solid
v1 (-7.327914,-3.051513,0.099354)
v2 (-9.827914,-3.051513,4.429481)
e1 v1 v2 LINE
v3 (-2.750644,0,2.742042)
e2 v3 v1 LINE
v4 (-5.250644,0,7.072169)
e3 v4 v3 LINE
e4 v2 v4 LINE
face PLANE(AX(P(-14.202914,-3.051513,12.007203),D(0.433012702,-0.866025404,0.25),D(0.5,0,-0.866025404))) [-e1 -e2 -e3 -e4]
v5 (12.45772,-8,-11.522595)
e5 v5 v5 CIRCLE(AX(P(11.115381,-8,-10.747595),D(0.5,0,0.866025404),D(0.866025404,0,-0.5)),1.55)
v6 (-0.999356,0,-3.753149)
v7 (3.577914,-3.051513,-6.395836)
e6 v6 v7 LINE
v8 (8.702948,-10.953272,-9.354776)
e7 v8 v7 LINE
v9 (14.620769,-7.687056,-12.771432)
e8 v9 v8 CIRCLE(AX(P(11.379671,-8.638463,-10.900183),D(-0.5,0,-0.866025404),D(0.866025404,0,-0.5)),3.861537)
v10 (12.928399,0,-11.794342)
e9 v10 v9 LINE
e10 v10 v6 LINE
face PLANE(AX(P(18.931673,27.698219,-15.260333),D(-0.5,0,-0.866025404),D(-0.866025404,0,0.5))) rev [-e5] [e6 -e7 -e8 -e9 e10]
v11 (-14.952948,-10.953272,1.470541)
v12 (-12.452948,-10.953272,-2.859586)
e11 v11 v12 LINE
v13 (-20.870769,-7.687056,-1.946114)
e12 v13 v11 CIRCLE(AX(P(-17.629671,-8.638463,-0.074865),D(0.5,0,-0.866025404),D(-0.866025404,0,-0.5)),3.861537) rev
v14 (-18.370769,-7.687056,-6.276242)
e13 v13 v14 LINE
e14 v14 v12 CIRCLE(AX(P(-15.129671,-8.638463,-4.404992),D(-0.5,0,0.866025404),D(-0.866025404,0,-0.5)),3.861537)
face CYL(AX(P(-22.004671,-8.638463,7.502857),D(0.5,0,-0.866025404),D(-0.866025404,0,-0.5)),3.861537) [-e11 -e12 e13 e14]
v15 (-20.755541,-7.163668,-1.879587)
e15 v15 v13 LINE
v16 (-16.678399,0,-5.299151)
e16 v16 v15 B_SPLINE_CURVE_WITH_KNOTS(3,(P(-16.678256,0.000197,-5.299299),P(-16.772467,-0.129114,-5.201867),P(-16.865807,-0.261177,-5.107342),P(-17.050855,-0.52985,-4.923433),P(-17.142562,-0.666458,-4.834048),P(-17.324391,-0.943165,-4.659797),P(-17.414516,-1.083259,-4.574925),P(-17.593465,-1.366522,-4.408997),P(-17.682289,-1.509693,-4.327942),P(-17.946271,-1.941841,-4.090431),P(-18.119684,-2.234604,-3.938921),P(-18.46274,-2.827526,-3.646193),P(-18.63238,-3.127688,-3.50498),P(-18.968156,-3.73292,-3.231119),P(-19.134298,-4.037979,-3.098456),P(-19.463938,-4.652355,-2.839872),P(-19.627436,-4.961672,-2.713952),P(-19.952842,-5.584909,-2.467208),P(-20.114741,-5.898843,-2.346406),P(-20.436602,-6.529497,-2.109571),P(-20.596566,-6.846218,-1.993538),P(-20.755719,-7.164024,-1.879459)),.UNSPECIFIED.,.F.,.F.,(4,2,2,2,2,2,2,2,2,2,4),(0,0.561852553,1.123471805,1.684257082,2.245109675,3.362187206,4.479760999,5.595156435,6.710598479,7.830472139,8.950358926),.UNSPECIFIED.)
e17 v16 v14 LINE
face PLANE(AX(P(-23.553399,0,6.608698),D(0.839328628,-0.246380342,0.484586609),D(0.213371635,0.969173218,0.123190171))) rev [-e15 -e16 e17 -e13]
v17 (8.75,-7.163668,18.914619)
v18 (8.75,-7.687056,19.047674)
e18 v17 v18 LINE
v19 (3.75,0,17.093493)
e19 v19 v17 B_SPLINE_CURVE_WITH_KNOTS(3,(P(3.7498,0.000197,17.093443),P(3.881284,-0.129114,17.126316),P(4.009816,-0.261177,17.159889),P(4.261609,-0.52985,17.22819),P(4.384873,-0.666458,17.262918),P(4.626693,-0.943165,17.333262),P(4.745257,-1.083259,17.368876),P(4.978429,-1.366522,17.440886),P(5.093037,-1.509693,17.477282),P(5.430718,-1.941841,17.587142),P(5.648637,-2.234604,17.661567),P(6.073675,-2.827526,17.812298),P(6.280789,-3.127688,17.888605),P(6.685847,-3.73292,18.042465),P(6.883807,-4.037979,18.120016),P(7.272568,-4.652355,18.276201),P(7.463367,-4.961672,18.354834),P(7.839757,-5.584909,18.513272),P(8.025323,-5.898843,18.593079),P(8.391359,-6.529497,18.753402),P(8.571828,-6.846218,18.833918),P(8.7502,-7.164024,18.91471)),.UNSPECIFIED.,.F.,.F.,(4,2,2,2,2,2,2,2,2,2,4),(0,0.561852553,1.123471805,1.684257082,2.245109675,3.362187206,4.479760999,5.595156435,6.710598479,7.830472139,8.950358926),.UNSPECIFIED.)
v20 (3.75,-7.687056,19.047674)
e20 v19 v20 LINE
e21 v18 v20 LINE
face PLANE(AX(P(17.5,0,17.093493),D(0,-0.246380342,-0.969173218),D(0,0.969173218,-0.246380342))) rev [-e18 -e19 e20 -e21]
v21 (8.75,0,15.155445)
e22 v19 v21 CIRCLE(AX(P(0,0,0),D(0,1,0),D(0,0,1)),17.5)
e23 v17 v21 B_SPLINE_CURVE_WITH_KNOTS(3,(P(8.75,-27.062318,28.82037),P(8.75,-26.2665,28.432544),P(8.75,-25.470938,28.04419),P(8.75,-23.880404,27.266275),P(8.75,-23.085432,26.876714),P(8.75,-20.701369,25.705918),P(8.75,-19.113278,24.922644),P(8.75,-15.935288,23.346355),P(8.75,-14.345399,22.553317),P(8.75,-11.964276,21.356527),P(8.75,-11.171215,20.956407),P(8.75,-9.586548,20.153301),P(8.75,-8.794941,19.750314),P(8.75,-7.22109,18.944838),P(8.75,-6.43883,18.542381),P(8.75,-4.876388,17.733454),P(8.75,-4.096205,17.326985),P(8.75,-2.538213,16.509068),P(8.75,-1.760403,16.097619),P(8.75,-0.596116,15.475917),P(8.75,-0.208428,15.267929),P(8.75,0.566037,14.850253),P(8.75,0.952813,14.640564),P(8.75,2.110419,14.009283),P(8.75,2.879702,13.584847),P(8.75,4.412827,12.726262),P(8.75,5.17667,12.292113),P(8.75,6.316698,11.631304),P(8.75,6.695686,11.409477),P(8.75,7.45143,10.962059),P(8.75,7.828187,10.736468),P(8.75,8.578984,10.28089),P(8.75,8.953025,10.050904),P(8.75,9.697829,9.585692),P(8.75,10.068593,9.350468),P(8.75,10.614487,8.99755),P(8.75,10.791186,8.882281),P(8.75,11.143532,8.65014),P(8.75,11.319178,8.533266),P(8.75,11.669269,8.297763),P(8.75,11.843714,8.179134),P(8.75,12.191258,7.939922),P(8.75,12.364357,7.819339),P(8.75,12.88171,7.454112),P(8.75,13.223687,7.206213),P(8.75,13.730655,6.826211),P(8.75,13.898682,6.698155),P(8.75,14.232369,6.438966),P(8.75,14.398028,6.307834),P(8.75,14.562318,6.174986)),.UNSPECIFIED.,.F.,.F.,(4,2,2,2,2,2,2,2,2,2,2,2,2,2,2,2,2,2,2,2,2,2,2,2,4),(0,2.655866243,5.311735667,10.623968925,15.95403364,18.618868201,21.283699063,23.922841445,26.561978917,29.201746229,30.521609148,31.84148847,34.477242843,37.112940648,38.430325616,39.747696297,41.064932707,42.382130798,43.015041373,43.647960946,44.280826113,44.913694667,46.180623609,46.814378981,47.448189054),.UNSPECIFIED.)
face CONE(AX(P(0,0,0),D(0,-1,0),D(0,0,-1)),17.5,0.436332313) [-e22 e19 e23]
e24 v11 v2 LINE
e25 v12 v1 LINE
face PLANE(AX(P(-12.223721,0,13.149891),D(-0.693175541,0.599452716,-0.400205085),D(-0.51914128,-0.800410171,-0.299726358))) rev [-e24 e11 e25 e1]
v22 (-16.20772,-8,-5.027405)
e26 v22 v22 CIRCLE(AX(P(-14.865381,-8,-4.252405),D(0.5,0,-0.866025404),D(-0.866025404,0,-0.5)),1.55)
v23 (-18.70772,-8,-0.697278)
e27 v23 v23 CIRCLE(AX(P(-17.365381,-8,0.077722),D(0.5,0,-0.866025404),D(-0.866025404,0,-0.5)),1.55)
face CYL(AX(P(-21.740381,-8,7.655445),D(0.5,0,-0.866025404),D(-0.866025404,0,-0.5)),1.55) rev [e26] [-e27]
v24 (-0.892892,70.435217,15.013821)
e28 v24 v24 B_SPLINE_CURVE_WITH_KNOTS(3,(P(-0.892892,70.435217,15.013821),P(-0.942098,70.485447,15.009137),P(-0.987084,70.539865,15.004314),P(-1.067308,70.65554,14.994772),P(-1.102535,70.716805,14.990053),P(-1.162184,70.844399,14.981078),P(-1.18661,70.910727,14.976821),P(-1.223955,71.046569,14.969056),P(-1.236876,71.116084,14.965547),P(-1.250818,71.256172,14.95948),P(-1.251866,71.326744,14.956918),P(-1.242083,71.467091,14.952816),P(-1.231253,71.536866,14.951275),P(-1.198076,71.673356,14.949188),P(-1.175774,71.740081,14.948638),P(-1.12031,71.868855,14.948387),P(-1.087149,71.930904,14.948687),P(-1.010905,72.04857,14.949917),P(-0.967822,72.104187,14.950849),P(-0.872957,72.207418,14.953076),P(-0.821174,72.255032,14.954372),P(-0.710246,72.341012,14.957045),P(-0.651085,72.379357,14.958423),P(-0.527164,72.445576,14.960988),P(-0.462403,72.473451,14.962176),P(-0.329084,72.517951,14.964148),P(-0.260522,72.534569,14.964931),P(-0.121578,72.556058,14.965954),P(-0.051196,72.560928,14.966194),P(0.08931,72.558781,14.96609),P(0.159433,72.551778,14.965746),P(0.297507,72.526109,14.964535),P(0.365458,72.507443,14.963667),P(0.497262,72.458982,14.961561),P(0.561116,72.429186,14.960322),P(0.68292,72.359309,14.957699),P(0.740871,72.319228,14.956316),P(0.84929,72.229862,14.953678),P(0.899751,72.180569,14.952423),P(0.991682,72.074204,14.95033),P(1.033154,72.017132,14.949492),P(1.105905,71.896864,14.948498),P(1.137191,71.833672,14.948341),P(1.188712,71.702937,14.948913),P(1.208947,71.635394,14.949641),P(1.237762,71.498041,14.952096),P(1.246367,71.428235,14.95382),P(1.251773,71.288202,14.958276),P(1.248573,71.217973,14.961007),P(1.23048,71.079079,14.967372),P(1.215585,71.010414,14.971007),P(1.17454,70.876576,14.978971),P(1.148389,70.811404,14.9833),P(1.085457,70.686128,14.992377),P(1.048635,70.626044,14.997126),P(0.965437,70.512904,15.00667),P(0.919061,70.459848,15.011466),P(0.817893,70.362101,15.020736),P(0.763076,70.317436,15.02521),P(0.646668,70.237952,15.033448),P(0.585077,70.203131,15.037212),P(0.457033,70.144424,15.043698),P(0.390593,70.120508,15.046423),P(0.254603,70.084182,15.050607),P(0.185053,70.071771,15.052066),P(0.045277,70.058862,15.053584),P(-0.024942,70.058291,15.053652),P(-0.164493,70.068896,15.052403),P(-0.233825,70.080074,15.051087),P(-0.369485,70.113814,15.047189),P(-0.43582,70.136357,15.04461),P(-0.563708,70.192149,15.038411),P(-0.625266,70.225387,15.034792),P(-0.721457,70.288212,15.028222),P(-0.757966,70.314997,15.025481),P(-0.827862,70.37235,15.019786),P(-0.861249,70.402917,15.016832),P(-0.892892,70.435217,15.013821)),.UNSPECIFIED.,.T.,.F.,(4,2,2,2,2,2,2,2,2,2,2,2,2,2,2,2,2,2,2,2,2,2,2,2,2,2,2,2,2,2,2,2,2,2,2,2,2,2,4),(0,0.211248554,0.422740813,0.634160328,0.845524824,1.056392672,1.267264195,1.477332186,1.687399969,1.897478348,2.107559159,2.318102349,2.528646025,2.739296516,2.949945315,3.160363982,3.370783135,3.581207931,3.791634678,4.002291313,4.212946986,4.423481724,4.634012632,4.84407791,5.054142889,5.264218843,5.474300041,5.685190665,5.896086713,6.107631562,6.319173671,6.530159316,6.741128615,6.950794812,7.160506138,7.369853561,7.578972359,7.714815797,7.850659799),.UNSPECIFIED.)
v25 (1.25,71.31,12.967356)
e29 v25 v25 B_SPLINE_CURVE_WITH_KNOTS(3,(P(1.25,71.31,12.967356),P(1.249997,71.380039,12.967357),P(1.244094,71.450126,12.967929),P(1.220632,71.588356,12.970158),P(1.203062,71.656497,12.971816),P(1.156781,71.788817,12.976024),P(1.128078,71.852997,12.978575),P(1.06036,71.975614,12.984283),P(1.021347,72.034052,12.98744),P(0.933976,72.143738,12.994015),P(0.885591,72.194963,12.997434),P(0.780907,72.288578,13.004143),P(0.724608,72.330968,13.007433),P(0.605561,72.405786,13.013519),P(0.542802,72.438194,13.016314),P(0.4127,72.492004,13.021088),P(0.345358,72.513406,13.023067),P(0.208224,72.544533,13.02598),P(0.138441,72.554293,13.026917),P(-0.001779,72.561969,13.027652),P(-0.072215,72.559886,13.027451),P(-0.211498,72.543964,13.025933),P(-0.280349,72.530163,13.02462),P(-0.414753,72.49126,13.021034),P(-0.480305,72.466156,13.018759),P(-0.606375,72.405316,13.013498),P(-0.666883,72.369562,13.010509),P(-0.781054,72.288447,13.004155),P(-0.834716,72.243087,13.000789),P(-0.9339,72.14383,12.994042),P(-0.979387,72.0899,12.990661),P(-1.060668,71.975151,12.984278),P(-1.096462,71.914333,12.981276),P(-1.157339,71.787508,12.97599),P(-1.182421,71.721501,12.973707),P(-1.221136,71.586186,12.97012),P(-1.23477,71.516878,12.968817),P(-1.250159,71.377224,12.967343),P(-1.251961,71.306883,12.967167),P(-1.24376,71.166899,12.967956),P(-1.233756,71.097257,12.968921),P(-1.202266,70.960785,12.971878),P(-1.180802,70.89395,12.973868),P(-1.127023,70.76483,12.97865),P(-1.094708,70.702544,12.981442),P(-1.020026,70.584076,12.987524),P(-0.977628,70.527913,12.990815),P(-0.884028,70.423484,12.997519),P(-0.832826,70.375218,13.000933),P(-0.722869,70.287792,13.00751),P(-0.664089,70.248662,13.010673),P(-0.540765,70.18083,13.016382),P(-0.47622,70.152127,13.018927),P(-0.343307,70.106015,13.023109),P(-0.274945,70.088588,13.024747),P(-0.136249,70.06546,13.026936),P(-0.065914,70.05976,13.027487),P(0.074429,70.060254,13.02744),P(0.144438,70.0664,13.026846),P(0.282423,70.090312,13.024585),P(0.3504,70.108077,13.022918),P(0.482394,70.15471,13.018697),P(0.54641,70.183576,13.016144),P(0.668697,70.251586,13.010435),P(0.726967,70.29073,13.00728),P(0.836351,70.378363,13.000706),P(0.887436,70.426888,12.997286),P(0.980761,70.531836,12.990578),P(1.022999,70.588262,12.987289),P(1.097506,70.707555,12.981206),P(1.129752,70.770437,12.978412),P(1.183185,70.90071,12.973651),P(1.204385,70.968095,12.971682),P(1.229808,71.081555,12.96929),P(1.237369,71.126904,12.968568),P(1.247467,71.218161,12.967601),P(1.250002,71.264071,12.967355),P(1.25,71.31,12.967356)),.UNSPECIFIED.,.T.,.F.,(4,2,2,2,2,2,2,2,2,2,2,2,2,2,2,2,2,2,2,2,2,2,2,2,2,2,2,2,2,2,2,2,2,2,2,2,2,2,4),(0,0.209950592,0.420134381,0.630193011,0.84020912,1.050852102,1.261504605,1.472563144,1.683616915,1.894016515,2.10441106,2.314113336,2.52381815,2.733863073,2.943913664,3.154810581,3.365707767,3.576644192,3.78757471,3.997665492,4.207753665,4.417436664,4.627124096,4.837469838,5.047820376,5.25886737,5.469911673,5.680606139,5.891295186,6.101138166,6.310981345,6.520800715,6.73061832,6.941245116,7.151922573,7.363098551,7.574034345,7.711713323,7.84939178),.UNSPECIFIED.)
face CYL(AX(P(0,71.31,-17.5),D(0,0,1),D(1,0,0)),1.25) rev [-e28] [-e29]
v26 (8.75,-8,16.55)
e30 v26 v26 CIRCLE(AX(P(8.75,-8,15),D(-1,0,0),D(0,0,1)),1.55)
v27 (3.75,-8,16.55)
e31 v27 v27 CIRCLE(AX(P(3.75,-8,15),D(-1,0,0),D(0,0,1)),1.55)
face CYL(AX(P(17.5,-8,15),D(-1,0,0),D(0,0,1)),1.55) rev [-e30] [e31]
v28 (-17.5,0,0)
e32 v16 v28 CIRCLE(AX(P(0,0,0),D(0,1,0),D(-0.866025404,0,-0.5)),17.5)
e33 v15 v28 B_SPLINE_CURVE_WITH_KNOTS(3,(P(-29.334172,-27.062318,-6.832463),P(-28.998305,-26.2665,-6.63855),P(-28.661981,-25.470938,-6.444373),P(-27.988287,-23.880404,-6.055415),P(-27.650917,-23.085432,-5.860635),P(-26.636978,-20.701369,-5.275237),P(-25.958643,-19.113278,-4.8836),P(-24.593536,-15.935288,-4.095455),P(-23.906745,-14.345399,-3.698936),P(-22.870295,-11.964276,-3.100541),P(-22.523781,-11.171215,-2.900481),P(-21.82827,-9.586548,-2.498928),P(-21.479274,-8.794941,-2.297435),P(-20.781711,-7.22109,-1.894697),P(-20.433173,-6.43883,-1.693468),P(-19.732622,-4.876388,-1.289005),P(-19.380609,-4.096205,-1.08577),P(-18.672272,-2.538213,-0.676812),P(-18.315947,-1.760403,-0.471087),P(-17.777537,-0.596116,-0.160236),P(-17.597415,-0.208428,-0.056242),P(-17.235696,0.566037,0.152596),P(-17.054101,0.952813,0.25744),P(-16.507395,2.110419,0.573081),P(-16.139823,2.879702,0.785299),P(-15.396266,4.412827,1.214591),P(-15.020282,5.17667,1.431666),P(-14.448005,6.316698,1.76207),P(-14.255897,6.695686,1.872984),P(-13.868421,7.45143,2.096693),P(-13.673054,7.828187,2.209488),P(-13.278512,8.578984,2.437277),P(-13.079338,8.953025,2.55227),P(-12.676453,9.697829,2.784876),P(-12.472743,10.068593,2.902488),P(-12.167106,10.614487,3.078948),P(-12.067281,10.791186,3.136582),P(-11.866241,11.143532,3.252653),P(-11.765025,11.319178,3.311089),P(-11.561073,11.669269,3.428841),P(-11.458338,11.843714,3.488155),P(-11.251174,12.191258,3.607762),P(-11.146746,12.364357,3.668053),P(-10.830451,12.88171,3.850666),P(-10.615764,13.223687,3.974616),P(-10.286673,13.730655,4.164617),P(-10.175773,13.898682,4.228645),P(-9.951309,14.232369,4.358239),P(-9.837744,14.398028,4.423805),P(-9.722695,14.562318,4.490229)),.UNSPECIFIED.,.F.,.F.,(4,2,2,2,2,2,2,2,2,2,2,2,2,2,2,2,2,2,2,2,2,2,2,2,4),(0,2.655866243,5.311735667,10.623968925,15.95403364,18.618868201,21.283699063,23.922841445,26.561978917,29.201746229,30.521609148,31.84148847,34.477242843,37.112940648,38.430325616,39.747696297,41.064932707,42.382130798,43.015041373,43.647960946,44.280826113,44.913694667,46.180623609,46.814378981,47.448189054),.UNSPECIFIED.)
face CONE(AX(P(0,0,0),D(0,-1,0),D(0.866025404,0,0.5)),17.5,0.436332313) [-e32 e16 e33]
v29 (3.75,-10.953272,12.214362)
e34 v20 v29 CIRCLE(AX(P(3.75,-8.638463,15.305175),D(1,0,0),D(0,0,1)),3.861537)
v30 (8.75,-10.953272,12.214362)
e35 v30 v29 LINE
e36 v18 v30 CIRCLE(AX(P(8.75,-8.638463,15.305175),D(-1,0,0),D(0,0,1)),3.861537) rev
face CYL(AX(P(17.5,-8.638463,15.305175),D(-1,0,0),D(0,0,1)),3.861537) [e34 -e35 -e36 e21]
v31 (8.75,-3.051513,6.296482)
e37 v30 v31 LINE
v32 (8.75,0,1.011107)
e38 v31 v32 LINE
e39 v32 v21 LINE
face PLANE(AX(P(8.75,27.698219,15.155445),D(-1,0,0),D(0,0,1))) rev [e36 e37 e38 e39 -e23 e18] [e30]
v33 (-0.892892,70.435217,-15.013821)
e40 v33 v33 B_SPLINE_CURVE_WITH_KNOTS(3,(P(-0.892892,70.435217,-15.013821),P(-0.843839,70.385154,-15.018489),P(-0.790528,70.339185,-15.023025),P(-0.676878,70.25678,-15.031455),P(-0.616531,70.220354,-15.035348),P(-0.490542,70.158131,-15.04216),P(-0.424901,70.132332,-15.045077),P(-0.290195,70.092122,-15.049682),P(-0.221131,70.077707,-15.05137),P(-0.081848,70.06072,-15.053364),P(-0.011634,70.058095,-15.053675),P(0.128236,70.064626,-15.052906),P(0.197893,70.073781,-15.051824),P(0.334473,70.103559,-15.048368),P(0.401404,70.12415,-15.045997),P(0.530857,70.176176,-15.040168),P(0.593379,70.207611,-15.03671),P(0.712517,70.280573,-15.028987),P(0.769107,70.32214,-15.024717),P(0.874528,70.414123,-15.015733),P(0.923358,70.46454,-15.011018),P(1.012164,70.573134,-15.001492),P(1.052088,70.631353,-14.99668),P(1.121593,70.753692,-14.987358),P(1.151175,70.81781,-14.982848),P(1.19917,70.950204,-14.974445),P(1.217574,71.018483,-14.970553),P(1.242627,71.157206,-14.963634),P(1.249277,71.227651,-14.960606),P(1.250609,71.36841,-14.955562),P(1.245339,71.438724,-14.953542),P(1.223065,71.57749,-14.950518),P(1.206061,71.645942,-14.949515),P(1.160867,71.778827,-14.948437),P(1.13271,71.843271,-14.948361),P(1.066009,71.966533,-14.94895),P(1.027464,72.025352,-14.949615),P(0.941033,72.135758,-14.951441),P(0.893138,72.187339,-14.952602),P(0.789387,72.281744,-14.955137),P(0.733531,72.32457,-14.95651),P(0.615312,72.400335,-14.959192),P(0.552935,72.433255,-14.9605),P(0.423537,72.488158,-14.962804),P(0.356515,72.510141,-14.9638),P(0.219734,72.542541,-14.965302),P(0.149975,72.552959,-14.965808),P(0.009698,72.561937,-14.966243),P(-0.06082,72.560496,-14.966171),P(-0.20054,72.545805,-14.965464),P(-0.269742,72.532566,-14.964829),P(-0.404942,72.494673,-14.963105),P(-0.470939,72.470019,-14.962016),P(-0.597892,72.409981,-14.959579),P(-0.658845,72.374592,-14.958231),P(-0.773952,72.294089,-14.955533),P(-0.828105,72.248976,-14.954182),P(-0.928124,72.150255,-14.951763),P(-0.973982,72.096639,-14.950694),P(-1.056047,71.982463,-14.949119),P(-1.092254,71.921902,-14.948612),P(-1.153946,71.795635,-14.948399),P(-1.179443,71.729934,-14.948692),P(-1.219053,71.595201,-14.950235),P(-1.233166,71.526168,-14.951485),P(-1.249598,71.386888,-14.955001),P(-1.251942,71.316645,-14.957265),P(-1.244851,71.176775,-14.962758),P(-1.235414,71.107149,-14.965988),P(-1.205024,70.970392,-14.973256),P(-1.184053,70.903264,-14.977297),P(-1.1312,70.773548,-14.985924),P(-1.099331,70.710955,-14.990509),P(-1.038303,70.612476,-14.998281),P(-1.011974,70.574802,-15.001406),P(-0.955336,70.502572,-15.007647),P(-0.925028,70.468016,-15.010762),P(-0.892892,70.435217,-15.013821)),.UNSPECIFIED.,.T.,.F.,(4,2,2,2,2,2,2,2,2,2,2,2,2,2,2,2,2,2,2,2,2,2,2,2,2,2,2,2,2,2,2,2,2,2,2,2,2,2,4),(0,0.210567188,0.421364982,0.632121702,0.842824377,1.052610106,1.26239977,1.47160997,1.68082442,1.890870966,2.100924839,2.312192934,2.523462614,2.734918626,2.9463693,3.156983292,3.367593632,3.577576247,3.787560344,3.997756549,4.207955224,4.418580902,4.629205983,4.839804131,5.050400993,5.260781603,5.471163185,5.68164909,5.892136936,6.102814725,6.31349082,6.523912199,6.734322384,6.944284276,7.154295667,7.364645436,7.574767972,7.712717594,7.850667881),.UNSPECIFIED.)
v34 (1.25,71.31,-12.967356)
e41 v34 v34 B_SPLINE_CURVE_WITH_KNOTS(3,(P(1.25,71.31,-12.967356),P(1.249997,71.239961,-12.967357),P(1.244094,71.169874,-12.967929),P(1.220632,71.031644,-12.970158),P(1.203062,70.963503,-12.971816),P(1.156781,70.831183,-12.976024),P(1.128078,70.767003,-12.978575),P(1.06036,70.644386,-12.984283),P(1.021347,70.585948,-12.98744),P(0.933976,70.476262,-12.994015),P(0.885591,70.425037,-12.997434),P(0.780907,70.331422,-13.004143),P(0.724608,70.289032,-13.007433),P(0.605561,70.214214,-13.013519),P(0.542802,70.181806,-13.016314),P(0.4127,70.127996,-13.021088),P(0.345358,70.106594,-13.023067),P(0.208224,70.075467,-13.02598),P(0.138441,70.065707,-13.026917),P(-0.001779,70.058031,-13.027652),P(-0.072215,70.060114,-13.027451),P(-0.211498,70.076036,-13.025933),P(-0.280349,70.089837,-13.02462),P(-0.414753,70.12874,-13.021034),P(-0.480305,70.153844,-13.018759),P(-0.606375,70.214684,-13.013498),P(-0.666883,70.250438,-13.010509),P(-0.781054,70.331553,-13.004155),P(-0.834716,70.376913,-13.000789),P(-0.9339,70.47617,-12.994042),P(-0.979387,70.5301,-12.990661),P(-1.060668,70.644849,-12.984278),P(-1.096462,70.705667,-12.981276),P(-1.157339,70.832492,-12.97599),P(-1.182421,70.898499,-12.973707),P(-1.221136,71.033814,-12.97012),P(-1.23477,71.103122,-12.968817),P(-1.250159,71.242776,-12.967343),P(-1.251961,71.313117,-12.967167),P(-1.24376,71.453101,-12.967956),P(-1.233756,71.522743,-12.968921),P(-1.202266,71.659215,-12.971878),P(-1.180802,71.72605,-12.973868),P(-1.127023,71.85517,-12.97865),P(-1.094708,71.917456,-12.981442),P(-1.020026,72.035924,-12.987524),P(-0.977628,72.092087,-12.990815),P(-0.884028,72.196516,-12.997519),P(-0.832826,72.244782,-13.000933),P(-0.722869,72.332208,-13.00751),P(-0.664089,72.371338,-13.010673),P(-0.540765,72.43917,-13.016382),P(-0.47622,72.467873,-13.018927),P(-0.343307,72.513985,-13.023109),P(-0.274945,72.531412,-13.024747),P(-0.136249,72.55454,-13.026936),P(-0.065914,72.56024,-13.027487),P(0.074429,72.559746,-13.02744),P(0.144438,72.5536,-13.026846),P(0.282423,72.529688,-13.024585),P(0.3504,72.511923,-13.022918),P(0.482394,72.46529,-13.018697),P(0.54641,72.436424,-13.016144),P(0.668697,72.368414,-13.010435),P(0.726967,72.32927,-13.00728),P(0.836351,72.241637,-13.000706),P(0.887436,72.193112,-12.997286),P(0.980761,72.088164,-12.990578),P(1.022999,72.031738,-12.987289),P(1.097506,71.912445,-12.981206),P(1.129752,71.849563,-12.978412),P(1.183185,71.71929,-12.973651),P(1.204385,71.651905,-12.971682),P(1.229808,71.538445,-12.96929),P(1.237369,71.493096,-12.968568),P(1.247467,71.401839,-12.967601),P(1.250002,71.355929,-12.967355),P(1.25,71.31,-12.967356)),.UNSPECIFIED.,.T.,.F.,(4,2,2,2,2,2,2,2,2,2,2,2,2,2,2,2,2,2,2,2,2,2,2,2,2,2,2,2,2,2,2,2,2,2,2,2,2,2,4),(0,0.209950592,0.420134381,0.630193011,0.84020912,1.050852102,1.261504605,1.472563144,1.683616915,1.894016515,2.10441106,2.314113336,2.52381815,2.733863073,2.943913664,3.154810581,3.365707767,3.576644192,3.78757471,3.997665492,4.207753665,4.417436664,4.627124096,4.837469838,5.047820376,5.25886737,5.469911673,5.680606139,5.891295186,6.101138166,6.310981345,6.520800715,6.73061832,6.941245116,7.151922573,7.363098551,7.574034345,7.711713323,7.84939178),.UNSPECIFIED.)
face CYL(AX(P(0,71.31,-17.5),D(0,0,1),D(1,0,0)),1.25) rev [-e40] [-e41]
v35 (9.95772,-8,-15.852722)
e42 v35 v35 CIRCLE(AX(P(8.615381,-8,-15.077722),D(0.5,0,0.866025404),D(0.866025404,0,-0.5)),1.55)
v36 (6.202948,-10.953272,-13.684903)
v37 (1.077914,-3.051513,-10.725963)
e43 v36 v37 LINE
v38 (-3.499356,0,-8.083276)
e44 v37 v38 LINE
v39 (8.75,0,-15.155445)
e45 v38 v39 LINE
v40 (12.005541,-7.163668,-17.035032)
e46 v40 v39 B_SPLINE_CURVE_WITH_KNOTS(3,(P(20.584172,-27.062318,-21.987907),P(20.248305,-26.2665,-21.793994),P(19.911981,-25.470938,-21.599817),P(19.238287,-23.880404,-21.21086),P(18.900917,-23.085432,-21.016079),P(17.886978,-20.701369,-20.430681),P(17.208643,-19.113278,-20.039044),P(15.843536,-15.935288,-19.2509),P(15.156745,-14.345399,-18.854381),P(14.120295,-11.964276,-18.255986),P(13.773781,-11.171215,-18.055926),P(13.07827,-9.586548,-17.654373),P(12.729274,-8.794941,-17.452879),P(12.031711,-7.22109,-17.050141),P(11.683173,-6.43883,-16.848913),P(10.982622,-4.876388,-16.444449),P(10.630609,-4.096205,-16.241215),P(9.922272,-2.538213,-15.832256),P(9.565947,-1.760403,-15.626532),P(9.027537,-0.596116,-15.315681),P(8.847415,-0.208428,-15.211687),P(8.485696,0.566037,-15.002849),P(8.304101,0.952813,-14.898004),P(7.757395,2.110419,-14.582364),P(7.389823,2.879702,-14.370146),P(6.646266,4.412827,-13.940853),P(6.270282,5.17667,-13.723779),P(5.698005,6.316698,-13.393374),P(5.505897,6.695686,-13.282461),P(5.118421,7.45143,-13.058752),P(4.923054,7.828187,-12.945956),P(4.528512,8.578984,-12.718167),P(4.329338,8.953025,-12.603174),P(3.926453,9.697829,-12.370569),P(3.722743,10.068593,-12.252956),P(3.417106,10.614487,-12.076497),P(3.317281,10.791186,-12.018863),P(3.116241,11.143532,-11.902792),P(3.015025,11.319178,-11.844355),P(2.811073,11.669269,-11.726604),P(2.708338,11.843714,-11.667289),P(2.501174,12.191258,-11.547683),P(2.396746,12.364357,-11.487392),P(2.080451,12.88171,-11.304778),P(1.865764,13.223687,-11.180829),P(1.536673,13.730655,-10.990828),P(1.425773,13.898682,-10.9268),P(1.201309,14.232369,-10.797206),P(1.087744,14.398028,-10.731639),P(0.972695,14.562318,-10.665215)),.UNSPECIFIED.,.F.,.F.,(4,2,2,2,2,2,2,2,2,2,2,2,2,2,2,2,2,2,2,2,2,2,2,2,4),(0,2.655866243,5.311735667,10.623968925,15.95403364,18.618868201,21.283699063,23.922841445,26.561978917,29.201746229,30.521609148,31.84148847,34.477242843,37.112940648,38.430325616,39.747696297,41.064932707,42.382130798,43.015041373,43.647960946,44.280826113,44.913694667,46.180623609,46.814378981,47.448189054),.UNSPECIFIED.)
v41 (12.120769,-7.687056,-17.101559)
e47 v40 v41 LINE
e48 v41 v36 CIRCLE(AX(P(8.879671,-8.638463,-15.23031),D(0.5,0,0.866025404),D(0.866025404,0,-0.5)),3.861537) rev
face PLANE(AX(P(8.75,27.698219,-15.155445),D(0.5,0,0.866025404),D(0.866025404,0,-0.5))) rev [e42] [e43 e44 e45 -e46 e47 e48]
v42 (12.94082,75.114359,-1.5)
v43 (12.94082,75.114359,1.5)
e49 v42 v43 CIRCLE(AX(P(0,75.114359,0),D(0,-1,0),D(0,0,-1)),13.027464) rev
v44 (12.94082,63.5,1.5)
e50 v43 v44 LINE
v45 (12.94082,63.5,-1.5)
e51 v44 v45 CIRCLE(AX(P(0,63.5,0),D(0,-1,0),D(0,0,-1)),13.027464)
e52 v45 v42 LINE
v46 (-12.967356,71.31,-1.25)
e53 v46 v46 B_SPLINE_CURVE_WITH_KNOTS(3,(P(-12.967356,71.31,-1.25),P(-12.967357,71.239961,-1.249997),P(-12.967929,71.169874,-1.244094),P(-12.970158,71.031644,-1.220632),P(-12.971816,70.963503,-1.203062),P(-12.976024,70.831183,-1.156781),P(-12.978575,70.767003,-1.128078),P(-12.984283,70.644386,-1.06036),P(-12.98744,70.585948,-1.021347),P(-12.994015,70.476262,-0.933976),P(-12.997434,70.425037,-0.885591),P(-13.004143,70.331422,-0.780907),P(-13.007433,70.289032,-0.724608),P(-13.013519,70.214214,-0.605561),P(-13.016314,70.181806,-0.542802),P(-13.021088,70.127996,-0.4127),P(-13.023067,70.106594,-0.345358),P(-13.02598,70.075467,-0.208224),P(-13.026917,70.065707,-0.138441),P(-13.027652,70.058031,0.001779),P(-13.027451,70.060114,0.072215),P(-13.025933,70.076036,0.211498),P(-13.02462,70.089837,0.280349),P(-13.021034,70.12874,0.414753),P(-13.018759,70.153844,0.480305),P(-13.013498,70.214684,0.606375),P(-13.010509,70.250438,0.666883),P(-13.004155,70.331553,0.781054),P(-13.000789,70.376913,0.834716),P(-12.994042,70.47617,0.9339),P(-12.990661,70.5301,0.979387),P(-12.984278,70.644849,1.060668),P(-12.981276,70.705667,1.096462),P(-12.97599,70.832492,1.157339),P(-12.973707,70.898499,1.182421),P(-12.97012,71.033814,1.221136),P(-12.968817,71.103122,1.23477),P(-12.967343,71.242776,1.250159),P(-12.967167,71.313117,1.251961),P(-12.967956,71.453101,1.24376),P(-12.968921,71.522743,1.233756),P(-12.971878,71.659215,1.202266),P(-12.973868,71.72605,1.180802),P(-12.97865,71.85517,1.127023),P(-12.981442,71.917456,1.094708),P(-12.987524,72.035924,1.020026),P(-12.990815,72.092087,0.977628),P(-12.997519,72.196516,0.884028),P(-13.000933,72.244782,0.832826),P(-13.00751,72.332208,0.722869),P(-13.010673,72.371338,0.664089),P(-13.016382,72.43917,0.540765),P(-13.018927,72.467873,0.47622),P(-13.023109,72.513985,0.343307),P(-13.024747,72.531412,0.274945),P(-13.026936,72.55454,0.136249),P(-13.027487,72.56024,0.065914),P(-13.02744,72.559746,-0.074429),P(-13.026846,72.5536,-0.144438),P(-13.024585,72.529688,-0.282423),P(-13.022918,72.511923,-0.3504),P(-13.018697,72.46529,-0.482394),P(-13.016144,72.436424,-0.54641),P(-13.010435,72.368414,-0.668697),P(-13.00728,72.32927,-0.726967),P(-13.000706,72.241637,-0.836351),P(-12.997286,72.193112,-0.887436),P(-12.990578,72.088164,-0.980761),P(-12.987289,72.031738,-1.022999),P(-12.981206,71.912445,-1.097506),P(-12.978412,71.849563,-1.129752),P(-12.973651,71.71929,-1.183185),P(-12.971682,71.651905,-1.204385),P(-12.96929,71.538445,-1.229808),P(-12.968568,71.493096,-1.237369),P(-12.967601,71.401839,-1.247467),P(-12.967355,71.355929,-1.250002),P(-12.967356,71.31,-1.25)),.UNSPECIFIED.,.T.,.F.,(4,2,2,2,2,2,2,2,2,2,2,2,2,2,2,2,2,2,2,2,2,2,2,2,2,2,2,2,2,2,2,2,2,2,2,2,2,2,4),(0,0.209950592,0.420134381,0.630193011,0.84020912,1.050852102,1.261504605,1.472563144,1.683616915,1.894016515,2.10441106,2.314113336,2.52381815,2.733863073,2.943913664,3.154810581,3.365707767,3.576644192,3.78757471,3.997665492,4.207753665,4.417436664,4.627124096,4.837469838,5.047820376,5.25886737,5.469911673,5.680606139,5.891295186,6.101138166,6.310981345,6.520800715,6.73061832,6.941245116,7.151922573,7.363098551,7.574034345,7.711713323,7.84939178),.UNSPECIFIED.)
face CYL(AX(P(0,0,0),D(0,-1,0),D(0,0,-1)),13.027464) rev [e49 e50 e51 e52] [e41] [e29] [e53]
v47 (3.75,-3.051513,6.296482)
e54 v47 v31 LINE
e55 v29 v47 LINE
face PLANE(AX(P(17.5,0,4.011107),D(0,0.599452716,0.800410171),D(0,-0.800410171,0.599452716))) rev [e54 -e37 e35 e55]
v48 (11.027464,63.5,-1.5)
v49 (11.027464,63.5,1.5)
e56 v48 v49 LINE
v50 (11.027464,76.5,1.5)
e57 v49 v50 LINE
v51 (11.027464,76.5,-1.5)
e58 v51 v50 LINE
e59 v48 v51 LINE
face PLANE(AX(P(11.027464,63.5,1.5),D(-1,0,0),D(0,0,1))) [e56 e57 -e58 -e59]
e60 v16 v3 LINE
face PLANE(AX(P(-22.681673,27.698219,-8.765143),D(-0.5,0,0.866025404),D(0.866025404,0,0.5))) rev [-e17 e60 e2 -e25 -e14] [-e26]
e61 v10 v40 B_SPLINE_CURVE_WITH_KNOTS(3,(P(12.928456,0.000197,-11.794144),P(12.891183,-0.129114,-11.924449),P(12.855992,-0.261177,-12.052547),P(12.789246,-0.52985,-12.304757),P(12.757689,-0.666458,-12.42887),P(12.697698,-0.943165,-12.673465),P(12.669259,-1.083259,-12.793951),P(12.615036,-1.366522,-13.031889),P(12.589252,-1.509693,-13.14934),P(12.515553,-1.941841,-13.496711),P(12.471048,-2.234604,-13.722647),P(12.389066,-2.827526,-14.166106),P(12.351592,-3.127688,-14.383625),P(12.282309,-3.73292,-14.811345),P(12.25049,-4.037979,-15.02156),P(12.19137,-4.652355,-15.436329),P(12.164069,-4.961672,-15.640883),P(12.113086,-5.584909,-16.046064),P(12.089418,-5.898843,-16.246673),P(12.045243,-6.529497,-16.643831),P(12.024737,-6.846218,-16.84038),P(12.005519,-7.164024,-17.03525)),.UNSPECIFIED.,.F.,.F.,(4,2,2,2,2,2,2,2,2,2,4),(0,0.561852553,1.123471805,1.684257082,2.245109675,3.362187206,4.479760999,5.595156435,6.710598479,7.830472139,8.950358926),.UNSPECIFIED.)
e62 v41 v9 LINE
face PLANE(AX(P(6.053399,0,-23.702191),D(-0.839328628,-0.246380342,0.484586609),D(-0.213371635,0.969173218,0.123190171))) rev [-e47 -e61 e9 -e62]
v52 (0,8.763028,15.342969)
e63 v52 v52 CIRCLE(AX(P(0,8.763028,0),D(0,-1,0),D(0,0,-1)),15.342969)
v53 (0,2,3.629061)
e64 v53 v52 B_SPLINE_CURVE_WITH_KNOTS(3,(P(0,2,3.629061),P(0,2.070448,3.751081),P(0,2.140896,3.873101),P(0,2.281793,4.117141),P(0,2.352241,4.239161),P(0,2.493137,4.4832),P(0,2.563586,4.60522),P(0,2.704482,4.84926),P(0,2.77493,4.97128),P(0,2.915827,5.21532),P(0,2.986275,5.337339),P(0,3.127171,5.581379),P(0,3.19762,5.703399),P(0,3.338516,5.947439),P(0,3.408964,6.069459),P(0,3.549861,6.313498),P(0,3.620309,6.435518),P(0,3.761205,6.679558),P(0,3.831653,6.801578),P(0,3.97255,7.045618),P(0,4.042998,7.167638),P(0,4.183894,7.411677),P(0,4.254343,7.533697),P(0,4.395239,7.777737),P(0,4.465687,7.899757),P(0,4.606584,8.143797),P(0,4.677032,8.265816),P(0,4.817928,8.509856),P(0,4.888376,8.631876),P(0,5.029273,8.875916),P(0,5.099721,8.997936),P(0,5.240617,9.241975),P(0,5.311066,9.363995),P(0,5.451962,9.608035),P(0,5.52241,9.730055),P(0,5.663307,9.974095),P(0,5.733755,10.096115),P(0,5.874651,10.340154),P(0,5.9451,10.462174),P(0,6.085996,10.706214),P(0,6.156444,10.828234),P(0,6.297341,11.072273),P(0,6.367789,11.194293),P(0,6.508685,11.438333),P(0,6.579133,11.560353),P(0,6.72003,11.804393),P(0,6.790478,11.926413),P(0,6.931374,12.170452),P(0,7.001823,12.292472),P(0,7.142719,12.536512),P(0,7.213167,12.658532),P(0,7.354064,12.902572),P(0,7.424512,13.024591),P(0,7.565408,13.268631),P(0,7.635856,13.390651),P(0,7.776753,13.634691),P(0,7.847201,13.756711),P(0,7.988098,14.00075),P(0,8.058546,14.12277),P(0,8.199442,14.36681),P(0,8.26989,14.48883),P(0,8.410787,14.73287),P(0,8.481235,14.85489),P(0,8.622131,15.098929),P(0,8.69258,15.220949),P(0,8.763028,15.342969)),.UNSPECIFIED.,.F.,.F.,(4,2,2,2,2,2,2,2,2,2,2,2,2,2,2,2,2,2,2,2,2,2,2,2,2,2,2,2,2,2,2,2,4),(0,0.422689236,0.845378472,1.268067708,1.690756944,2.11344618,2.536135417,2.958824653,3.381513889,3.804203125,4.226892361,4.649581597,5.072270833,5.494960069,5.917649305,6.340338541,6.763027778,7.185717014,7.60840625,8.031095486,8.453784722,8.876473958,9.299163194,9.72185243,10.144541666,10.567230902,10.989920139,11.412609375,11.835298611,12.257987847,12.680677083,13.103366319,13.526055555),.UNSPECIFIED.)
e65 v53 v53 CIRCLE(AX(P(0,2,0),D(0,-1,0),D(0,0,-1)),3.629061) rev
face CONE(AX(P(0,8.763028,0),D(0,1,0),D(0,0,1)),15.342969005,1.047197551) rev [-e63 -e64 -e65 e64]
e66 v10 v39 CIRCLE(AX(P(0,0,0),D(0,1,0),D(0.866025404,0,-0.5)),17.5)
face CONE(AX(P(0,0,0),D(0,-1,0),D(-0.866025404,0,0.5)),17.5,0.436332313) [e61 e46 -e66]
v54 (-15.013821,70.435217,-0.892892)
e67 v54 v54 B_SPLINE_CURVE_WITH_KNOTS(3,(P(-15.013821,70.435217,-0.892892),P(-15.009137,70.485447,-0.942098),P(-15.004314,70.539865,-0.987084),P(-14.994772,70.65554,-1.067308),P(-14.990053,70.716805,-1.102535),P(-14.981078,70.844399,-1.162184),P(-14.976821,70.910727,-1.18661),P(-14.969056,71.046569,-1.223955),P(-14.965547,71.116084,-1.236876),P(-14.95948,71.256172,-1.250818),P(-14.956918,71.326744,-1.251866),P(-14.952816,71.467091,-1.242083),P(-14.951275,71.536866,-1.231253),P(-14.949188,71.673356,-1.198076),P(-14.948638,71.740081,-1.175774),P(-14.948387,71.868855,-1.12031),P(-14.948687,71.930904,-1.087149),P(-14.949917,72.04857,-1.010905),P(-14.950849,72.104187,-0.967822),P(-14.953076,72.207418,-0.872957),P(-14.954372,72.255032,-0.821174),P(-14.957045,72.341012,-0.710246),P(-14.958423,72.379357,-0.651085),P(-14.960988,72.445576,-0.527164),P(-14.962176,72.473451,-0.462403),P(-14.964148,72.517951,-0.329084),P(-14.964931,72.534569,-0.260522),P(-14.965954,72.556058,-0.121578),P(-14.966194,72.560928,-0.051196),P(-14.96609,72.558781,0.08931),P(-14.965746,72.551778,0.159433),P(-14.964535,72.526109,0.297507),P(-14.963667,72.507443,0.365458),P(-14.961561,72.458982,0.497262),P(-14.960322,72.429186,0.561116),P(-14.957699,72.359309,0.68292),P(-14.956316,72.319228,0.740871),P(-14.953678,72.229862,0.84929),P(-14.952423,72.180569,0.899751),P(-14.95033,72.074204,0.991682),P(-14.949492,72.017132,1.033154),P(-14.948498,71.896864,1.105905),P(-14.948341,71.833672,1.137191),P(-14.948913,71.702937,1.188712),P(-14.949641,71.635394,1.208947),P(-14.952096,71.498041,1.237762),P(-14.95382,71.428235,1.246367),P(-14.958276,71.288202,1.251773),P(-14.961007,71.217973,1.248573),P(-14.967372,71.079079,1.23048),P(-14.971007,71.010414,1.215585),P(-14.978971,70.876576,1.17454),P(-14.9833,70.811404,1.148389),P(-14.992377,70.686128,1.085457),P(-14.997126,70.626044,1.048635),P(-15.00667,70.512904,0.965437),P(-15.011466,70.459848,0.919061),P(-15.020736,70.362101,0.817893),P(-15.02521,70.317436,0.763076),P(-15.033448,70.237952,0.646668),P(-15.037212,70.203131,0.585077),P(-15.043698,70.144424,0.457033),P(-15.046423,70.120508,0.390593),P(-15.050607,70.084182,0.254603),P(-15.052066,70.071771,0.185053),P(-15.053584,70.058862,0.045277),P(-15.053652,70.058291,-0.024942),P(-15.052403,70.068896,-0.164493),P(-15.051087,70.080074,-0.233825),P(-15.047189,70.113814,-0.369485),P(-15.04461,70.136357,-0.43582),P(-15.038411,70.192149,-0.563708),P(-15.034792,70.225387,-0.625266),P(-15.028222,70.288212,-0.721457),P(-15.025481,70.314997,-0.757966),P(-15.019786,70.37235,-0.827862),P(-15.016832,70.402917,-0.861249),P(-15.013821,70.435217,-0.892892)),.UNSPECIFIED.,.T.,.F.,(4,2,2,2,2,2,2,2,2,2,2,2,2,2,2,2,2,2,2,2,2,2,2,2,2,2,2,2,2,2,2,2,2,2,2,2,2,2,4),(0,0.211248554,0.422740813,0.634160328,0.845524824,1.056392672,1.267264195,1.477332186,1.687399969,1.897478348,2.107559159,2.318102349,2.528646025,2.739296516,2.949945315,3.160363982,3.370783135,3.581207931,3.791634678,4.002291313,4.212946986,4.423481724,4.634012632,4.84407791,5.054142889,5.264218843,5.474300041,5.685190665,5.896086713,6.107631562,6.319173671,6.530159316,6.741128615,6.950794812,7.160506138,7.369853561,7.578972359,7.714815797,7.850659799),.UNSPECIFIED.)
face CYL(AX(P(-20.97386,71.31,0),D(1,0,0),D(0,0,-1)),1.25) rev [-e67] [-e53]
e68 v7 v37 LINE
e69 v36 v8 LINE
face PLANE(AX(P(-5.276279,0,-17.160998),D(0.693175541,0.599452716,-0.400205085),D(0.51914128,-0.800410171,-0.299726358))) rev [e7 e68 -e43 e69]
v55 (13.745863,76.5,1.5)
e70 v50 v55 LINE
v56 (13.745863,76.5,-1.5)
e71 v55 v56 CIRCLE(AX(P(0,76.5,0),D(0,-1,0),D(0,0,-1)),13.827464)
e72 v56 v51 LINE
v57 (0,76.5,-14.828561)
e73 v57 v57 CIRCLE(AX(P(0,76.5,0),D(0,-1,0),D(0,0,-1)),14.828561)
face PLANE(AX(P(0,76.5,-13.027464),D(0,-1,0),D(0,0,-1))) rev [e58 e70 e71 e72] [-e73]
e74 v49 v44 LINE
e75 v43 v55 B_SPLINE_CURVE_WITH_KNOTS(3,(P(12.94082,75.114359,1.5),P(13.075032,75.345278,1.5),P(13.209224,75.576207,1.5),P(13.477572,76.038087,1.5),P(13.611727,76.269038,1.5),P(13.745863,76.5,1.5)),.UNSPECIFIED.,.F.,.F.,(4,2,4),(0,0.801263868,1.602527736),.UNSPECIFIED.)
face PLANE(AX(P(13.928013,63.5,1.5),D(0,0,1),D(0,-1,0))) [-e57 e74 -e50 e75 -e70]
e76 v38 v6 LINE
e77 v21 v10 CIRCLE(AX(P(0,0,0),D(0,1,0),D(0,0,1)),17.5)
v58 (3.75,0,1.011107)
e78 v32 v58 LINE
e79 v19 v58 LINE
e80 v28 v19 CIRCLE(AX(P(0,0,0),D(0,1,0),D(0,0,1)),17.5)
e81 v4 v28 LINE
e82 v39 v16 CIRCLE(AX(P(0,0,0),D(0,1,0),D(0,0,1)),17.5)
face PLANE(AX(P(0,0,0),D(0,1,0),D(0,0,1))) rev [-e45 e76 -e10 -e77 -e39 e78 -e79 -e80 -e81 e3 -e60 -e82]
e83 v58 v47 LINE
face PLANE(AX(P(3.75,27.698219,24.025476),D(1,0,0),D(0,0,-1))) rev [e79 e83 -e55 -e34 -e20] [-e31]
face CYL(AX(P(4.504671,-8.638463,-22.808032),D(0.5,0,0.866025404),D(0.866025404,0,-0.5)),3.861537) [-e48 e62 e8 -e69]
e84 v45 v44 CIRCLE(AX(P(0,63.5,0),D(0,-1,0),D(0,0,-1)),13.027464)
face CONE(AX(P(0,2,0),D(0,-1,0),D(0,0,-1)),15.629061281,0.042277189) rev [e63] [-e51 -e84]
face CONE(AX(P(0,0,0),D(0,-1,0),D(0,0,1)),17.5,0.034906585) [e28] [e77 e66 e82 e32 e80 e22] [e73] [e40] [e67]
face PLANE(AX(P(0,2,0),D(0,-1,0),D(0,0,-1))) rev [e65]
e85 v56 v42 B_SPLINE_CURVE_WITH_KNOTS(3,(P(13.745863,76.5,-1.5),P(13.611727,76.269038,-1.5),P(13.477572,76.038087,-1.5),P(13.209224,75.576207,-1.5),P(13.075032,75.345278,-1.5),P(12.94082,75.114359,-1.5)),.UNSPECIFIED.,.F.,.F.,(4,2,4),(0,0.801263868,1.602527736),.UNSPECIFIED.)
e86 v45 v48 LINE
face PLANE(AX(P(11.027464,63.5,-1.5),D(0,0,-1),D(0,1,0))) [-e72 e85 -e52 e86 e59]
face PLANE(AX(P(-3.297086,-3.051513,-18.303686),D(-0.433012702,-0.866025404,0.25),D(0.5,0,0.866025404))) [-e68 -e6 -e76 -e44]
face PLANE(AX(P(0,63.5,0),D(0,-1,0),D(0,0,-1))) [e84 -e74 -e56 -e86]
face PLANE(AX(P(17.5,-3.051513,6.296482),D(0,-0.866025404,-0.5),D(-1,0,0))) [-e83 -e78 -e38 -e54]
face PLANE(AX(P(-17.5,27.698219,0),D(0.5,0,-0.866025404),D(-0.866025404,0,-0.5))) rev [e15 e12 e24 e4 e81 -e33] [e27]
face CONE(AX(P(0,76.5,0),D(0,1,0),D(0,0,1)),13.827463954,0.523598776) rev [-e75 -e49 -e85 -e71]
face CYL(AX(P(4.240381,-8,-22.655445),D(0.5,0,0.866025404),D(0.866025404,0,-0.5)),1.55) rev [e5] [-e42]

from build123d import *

# Parameters (mm, degrees)
SKETCH_1_R               = 17.5
EXTRUDE_1_DEPTH          = 200
EXTRUDE_1_TAPER          = 2
EXTRUDE_2_DEPTH          = 12.5
EXTRUDE_2_DRAFT          = -25
CUT_EXTRUDE_1_DEPTH      = 12.5
SKETCH_5_R               = 1.55
CUT_EXTRUDE_2_DEPTH      = 203.439460302
CHAMFER_1_SIZE           = 3
CHAMFER_1_SIZE2          = 3.812436427
PATTERN_CIRCULAR_2_COUNT = 3
EXTRUDE_3_DEPTH          = 13
SKETCH_12_R              = 1.25
CUT_EXTRUDE_3_DEPTH      = 82.605855603
CUT_EXTRUDE_4_DEPTH      = 82.605855603
CUT_EXTRUDE_4_DEPTH_BACK = 82.605855603
SKETCH_13_R              = 1.25
CHAMFER_3_SIZE           = 12
CHAMFER_3_SIZE2          = 6.769076267
CHAMFER_4_SIZE           = 0.8
CHAMFER_4_SIZE2          = 1.385640646


with BuildPart() as part:
    # 草图1 → 凸台-拉伸1 (new body)
    with BuildSketch(Plane(origin=(0, 0, 0), x_dir=(1, 0, 0), z_dir=(0, 1, 0))):
        Circle(SKETCH_1_R)
    extrude(amount=EXTRUDE_1_DEPTH, taper=EXTRUDE_1_TAPER)


with BuildPart() as extrude_2_tool:
    # 凸台-拉伸2: read off the stored shape, not the designer's step
    # 凸台-拉伸2 outline → 凸台-拉伸2 (with draft: the straight prism first)
    with BuildSketch(Plane.XZ.offset(12.5)):
        with BuildLine():
            Line((-2.078845727, -1.817738728), (14.578845727, -1.817738728))
            Line((14.578845727, -1.817738728), (14.578845727, 18.212421591))
            ThreePointArc((14.578845727, 18.212421591), (6.735850314, 22.335249349), (-2.078845727, 23.236037601))
            Line((-2.078845727, 23.236037601), (-2.078845727, -1.817738728))
        make_face()
    extrude(amount=-EXTRUDE_2_DEPTH)
    # 凸台-拉伸2: the draft: its side faces are tilted about the plane it starts from
    extrude_2_sides = [extrude_2_tool.faces().sort_by_distance(p)[0] for p in [
        (-2.078845727, -6.25, 10.709149437),
        (6.25, -6.25, -1.817738728),
        (14.578845727, -6.25, 8.197341431),
        (6.735850314, -6.25, 22.335249349),
    ]]
    draft(extrude_2_sides, Plane.XZ.offset(12.5), EXTRUDE_2_DRAFT)


with BuildPart() as part_1:
    add(part.part)

    # 凸台-拉伸2: add extrude_2_tool
    add(extrude_2_tool.part)

    # 草图4 → 切除-拉伸1 (cut)
    with BuildSketch(Plane.XZ.offset(12.5)):
        Polygon((8.75, 15.155444566), (8.75, 21.625737975), (8.75, 22.625737975), (15.578845727, 22.625737975), (15.578845727, -2.817738728), (8.75, -2.817738728), (8.75, 4.011106999), align=None)
        Polygon((3.75, 17.093492914), (3.75, 23.025475955), (3.75, 24.025475955), (-3.078845727, 24.025475955), (-3.078845727, -2.817738728), (3.75, -2.817738728), (3.75, 4.011106999), align=None)
    extrude(amount=-CUT_EXTRUDE_1_DEPTH, mode=Mode.SUBTRACT)

    # 草图5 → 切除-拉伸2 (cut, through all)
    with BuildSketch(Plane.ZY.offset(-3.75)):
        with Locations((15, -8)):
            Circle(SKETCH_5_R)
        with BuildLine():
            Line((4.011106999, 0), (12.214361758, -10.95327183))
            ThreePointArc((12.214361758, -10.95327183), (16.970472378, -12.122462651), (19.047673538, -7.68705616))
            Line((19.047673538, -7.68705616), (17.093492914, 0))
            Line((17.093492914, 0), (24.025475955, 0))
            Line((24.025475955, 0), (24.025475955, -13.5))
            Line((24.025475955, -13.5), (-2.817738728, -13.5))
            Line((-2.817738728, -13.5), (-2.817738728, 0))
            Line((-2.817738728, 0), (4.011106999, 0))
        make_face()
    extrude(amount=-CUT_EXTRUDE_2_DEPTH, mode=Mode.SUBTRACT)

    # 倒角1
    chamfer_1_edges = [part_1.edges().sort_by_distance(p)[0] for p in [
        (6.25, 0, 4.011106999),
    ]]
    chamfer_1_side = [part_1.faces().sort_by_distance(p)[0] for p in [
        (-0.420899726, 0, -0.691089635),
    ]]
    chamfer(chamfer_1_edges, length=CHAMFER_1_SIZE, length2=CHAMFER_1_SIZE2, reference=chamfer_1_side[0])


with BuildPart() as pattern_circular_2_1:
    # 阵列(圆周)2: pattern copy
    add(part_1.part.rotate(Axis((0, 0, 0), (0, 1, 0)), 1 * 360 / PATTERN_CIRCULAR_2_COUNT))


with BuildPart() as pattern_circular_2_2:
    # 阵列(圆周)2: pattern copy
    add(part_1.part.rotate(Axis((0, 0, 0), (0, 1, 0)), 2 * 360 / PATTERN_CIRCULAR_2_COUNT))


with BuildPart() as pattern_circular_2_1_1:
    add(pattern_circular_2_1.part)

    # Combine 1: read off the stored shape, not the designer's step
    # Combine 1: union 阵列(圆周)2_2, part
    add(pattern_circular_2_2.part)
    add(part_1.part)

    # 草图10 → 切除-旋转1 (revolve, cut)
    with BuildSketch(Plane(origin=(0, 0, 0), x_dir=(0, 0, -1), z_dir=(1, 0, 0))):
        Polygon((0, 2), (15.629061281, 2), (13.027463954, 63.5), (13.027463954, 76.5), (23.027463954, 76.5), (23.027463954, 210), (0, 210), align=None)
    revolve(axis=Axis((0, 0, 0), (0, 1, 0)), mode=Mode.SUBTRACT)

    # 草图11 → 凸台-拉伸3 (add)
    with BuildSketch(Plane(origin=(0, 76.5, 0), x_dir=(1, 0, 0), z_dir=(0, 1, 0))):
        Polygon((13.928012544, 0), (13.928012544, -1.5), (11.027463954, -1.5), (11.027463954, 1.5), (13.928012544, 1.5), align=None)
    extrude(amount=-EXTRUDE_3_DEPTH)

    # 草图12 → 切除-拉伸3 (cut, through all)
    with BuildSketch(Plane(origin=(0, 0, 0), x_dir=(0, 0, -1), z_dir=(1, 0, 0))):
        with Locations((0, 71.31)):
            Circle(SKETCH_12_R)
    extrude(amount=-CUT_EXTRUDE_3_DEPTH, mode=Mode.SUBTRACT)

    # 草图13 → 切除-拉伸4 (cut, two sides: drawn at the far end of the back side and taken through both)
    with BuildSketch(Plane.XY.offset(-CUT_EXTRUDE_4_DEPTH_BACK)):
        with Locations((0, 71.31)):
            Circle(SKETCH_13_R)
    extrude(amount=CUT_EXTRUDE_4_DEPTH + CUT_EXTRUDE_4_DEPTH_BACK, mode=Mode.SUBTRACT)

    # 倒角3
    chamfer_3_edges = [pattern_circular_2_1_1.edges().sort_by_distance(p)[0] for p in [
        (0, 2, 15.629061281),
    ]]
    chamfer_3_side = [pattern_circular_2_1_1.faces().sort_by_distance(p)[0] for p in [
        (0, 2, 0),
    ]]
    chamfer(chamfer_3_edges, length=CHAMFER_3_SIZE, length2=CHAMFER_3_SIZE2, reference=chamfer_3_side[0])

    # 倒角4
    chamfer_4_edges = [pattern_circular_2_1_1.edges().sort_by_distance(p)[0] for p in [
        (-13.027463954, 76.5, 0),
    ]]
    chamfer_4_side = [pattern_circular_2_1_1.faces().sort_by_distance(p)[0] for p in [
        (7.204573044, 76.5, 12.47868656),
    ]]
    chamfer(chamfer_4_edges, length=CHAMFER_4_SIZE, length2=CHAMFER_4_SIZE2, reference=chamfer_4_side[0])


solid = pattern_circular_2_1_1.part
